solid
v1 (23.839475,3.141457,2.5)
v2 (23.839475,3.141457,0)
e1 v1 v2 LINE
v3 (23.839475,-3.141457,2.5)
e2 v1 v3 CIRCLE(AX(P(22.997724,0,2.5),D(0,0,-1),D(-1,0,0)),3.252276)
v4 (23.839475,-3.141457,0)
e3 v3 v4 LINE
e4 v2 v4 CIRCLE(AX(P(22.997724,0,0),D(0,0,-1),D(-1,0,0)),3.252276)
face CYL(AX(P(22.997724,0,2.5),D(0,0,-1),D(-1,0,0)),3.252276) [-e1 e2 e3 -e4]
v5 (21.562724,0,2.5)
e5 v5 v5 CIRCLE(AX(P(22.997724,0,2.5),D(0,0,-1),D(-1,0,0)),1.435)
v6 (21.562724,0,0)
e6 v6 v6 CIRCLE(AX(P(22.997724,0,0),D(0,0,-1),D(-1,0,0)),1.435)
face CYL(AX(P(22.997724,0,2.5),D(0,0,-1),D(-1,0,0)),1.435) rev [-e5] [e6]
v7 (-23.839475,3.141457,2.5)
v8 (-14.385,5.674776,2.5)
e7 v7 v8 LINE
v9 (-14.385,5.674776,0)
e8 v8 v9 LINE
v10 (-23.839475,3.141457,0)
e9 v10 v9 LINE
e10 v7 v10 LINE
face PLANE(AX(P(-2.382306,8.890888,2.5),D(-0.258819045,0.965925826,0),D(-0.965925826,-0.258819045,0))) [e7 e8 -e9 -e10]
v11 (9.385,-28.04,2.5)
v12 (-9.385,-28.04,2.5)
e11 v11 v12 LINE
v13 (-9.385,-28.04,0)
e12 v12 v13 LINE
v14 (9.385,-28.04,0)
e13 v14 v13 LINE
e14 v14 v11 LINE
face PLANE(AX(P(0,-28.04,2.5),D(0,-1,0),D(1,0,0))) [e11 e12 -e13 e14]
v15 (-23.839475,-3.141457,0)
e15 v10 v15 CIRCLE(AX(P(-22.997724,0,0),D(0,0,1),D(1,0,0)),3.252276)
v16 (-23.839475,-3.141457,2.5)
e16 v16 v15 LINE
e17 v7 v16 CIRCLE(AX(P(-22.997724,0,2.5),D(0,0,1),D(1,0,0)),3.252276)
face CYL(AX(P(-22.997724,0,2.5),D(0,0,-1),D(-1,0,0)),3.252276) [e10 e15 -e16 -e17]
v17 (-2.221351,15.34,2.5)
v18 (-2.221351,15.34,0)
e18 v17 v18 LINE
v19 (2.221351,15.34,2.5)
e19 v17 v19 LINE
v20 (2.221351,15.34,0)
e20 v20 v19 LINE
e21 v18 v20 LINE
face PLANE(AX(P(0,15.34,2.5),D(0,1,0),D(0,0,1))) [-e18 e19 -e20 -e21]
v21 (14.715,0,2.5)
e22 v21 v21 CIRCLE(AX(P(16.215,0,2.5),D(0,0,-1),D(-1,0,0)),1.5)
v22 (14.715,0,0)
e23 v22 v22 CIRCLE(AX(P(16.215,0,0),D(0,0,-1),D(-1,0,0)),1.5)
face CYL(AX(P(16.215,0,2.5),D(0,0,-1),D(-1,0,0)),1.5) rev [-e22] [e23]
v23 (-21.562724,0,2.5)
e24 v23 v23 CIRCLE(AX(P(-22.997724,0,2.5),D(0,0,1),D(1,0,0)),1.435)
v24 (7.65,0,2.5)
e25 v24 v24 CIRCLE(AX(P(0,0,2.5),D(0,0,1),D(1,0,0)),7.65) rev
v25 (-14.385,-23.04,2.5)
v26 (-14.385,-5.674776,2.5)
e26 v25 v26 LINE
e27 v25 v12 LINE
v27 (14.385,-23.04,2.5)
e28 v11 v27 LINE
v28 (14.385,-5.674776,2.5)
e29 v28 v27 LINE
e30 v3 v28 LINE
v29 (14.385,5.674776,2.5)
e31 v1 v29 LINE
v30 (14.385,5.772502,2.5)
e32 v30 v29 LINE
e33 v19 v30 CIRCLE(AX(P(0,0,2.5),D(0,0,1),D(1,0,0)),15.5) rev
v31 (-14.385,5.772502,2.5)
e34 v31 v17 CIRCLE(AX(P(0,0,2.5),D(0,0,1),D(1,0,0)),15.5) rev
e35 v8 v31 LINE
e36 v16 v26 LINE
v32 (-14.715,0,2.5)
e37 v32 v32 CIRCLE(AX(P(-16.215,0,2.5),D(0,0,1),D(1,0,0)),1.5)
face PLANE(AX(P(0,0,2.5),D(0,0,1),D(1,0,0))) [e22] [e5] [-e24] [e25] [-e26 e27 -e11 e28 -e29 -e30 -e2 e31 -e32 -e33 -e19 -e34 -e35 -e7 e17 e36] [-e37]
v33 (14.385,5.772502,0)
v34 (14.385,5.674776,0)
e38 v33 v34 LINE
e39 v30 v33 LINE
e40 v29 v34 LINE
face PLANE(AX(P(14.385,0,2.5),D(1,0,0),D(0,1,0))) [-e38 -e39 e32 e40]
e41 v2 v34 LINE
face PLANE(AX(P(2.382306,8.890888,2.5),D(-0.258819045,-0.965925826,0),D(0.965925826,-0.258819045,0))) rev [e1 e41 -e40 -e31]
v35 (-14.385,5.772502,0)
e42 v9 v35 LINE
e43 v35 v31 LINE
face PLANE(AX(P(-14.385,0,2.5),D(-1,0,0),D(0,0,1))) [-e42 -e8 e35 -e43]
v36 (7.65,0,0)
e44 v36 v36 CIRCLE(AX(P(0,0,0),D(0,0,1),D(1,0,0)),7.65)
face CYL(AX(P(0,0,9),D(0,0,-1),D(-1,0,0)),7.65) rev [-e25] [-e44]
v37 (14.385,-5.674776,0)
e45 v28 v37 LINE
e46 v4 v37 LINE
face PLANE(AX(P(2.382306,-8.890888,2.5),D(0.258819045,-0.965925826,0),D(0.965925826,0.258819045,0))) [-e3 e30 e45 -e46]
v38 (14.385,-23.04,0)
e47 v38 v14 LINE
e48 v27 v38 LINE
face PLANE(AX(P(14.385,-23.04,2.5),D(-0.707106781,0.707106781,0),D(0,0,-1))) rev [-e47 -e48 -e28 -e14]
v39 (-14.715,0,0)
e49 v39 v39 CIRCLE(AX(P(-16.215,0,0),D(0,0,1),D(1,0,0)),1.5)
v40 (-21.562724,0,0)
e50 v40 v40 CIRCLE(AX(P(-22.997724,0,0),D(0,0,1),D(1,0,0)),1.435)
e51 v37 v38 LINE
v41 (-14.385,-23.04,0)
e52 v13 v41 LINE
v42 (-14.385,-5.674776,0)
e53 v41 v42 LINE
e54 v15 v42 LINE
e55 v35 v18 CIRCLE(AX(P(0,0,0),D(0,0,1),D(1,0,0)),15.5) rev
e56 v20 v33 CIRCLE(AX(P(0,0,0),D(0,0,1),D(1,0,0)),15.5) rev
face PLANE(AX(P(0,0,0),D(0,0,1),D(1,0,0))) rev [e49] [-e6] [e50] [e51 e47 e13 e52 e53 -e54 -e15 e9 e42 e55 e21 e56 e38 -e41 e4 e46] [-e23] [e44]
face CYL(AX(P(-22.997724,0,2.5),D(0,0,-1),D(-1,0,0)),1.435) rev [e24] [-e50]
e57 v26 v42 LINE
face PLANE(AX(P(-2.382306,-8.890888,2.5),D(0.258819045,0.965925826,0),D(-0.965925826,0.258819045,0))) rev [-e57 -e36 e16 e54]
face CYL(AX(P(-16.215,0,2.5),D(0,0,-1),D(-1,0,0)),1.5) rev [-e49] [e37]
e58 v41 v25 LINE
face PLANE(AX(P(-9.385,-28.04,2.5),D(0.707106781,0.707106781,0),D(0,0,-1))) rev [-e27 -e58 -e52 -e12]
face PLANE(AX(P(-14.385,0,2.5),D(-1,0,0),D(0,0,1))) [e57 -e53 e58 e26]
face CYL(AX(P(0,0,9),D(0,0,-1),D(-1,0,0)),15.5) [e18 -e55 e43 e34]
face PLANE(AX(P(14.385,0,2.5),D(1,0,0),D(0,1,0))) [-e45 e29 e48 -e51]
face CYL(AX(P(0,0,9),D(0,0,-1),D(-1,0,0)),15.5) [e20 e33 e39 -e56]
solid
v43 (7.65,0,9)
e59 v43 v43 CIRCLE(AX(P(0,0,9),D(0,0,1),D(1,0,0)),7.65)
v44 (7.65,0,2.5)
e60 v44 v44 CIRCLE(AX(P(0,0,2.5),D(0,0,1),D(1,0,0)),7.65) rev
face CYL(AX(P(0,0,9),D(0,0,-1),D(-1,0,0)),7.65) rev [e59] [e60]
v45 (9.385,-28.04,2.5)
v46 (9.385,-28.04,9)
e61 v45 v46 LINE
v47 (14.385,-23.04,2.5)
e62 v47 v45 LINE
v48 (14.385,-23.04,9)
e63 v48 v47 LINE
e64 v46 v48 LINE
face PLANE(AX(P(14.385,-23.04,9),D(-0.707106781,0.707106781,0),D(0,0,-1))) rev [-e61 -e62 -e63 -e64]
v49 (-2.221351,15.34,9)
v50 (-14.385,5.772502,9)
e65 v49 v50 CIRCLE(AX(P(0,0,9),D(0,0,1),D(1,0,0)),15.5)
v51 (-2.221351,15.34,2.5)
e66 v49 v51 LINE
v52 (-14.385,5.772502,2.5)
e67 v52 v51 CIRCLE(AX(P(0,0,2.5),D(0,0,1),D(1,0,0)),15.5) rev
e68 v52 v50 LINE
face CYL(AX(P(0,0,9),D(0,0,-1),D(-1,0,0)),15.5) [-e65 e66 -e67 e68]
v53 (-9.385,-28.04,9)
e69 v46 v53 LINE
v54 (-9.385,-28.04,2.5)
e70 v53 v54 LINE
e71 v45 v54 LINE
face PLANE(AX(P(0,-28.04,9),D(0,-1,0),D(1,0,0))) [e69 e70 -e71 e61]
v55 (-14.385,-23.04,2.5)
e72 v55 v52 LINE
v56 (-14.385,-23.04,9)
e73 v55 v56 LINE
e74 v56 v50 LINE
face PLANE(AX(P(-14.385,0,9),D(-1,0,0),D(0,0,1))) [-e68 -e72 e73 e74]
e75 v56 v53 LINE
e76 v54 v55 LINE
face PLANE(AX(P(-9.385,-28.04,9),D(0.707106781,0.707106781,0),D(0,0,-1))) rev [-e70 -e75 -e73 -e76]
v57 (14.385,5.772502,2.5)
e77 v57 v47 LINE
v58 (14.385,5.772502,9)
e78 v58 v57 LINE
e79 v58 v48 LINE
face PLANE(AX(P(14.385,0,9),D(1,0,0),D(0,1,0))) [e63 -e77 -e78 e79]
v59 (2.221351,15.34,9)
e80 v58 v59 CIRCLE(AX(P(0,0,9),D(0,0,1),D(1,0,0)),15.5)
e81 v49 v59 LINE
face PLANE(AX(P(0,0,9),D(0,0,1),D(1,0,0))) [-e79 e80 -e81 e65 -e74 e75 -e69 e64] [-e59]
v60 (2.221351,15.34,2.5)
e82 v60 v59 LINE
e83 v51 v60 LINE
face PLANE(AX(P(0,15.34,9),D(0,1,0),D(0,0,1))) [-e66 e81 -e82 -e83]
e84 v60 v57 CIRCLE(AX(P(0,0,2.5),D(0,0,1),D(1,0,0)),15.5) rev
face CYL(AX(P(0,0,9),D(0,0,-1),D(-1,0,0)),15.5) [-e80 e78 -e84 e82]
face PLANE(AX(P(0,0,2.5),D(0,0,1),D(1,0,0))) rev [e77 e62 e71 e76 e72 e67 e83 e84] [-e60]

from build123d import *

# Parameters (mm, degrees)
EXTRUDE_1_DEPTH       = 2.5
EXTRUDE_START         = 2.5
EXTRUDE_3_DEPTH       = 6.5
CUT_EXTRUDE_2_DEPTH   = 9
SKETCH_2_R            = 7.65
CUT_EXTRUDE_4_DEPTH   = 33.774530126
EXTRUDE_2_OUTLINE_R   = 1.435
EXTRUDE_2_OUTLINE_R_2 = 1.5
EXTRUDE_2_DEPTH       = 2.5
CHAMFER_1_SIZE        = 5
CHAMFER_2_SIZE        = 5


# Read off the part's stored shape, not the designer's step: Бобышка-Вытянуть2
with BuildPart() as part:
    # Эскиз1 → Бобышка-Вытянуть1 (new body)
    with BuildSketch(Plane.XY):
        Polygon((14.385, 15.34), (0, 15.34), (-14.385, 15.34), (-14.385, -28.04), (14.385, -28.04), align=None)
    extrude(amount=EXTRUDE_1_DEPTH)


with BuildPart() as body_2:
    # Эскиз1<3> → Бобышка-Вытянуть3 (new body)
    with BuildSketch(Plane.XY.offset(EXTRUDE_START)):
        Polygon((14.385, 15.34), (0, 15.34), (-14.385, 15.34), (-14.385, -28.04), (14.385, -28.04), align=None)
    extrude(amount=EXTRUDE_3_DEPTH)


with BuildPart() as cut_extrude_2_tool:
    # Эскиз3 → Вырез-Вытянуть2 (new body)
    with BuildSketch(Plane.XY):
        with BuildLine():
            Line((-14.385, 15.34), (-14.385, 5.772501624))
            ThreePointArc((-14.385, 5.772501624), (-9.582639468, 12.182898703), (-2.22135094, 15.34))
            Line((-2.22135094, 15.34), (-14.385, 15.34))
        make_face()
        with BuildLine():
            Line((14.385, 15.34), (2.22135094, 15.34))
            ThreePointArc((2.22135094, 15.34), (9.582639468, 12.182898703), (14.385, 5.772501624))
            Line((14.385, 5.772501624), (14.385, 15.34))
        make_face()
    extrude(amount=CUT_EXTRUDE_2_DEPTH)


with BuildPart() as part_1:
    add(part.part)

    # Вырез-Вытянуть2: cut by cut_extrude_2_tool
    add(cut_extrude_2_tool.part, mode=Mode.SUBTRACT)


with BuildPart() as body_2_1:
    add(body_2.part)

    # Вырез-Вытянуть2: cut by cut_extrude_2_tool
    add(cut_extrude_2_tool.part, mode=Mode.SUBTRACT)


with BuildPart() as cut_extrude_4_tool:
    # Эскиз2 → Вырез-Вытянуть4 (new, through all)
    with BuildSketch(Plane.XY):
        Circle(SKETCH_2_R)
    extrude(amount=CUT_EXTRUDE_4_DEPTH)


with BuildPart() as part_2:
    add(part_1.part)

    # Вырез-Вытянуть4: cut by cut_extrude_4_tool
    add(cut_extrude_4_tool.part, mode=Mode.SUBTRACT)

    # Бобышка-Вытянуть2 outline → Бобышка-Вытянуть2 (add)
    with BuildSketch(Plane.XY):
        with BuildLine():
            ThreePointArc((-23.83947488, 3.141457498), (-26.25, 0), (-23.83947488, -3.141457498))
            Line((-23.83947488, -3.141457498), (-14.385, -5.674776407))
            Line((-14.385, -5.674776407), (-14.385, 5.674776407))
            Line((-14.385, 5.674776407), (-23.83947488, 3.141457498))
        make_face()
        with Locations((-22.997723881, 0)):
            Circle(EXTRUDE_2_OUTLINE_R, mode=Mode.SUBTRACT)
        with Locations((-16.215, 0)):
            Circle(EXTRUDE_2_OUTLINE_R_2, mode=Mode.SUBTRACT)
    extrude_2 = extrude(amount=EXTRUDE_2_DEPTH)

    # Зеркальное отражение1: Бобышка-Вытянуть2 across plane
    add(extrude_2.mirror(Plane(origin=(0, 0, 0), x_dir=(0, 0, 1), z_dir=(1, 0, 0))))

    # Фаска1
    chamfer_1_edges = [part_2.edges().sort_by_distance(p)[0] for p in [
        (14.385, -28.04, 1.25),
        (-14.385, -28.04, 1.25),
    ]]
    chamfer(chamfer_1_edges, length=CHAMFER_1_SIZE)


with BuildPart() as body_2_2:
    add(body_2_1.part)

    # Вырез-Вытянуть4: cut by cut_extrude_4_tool
    add(cut_extrude_4_tool.part, mode=Mode.SUBTRACT)

    # Фаска2
    chamfer_2_edges = [body_2_2.edges().sort_by_distance(p)[0] for p in [
        (14.385, -28.04, 5.75),
        (-14.385, -28.04, 5.75),
    ]]
    chamfer(chamfer_2_edges, length=CHAMFER_2_SIZE)


solid = Compound([part_2.part, body_2_2.part])
